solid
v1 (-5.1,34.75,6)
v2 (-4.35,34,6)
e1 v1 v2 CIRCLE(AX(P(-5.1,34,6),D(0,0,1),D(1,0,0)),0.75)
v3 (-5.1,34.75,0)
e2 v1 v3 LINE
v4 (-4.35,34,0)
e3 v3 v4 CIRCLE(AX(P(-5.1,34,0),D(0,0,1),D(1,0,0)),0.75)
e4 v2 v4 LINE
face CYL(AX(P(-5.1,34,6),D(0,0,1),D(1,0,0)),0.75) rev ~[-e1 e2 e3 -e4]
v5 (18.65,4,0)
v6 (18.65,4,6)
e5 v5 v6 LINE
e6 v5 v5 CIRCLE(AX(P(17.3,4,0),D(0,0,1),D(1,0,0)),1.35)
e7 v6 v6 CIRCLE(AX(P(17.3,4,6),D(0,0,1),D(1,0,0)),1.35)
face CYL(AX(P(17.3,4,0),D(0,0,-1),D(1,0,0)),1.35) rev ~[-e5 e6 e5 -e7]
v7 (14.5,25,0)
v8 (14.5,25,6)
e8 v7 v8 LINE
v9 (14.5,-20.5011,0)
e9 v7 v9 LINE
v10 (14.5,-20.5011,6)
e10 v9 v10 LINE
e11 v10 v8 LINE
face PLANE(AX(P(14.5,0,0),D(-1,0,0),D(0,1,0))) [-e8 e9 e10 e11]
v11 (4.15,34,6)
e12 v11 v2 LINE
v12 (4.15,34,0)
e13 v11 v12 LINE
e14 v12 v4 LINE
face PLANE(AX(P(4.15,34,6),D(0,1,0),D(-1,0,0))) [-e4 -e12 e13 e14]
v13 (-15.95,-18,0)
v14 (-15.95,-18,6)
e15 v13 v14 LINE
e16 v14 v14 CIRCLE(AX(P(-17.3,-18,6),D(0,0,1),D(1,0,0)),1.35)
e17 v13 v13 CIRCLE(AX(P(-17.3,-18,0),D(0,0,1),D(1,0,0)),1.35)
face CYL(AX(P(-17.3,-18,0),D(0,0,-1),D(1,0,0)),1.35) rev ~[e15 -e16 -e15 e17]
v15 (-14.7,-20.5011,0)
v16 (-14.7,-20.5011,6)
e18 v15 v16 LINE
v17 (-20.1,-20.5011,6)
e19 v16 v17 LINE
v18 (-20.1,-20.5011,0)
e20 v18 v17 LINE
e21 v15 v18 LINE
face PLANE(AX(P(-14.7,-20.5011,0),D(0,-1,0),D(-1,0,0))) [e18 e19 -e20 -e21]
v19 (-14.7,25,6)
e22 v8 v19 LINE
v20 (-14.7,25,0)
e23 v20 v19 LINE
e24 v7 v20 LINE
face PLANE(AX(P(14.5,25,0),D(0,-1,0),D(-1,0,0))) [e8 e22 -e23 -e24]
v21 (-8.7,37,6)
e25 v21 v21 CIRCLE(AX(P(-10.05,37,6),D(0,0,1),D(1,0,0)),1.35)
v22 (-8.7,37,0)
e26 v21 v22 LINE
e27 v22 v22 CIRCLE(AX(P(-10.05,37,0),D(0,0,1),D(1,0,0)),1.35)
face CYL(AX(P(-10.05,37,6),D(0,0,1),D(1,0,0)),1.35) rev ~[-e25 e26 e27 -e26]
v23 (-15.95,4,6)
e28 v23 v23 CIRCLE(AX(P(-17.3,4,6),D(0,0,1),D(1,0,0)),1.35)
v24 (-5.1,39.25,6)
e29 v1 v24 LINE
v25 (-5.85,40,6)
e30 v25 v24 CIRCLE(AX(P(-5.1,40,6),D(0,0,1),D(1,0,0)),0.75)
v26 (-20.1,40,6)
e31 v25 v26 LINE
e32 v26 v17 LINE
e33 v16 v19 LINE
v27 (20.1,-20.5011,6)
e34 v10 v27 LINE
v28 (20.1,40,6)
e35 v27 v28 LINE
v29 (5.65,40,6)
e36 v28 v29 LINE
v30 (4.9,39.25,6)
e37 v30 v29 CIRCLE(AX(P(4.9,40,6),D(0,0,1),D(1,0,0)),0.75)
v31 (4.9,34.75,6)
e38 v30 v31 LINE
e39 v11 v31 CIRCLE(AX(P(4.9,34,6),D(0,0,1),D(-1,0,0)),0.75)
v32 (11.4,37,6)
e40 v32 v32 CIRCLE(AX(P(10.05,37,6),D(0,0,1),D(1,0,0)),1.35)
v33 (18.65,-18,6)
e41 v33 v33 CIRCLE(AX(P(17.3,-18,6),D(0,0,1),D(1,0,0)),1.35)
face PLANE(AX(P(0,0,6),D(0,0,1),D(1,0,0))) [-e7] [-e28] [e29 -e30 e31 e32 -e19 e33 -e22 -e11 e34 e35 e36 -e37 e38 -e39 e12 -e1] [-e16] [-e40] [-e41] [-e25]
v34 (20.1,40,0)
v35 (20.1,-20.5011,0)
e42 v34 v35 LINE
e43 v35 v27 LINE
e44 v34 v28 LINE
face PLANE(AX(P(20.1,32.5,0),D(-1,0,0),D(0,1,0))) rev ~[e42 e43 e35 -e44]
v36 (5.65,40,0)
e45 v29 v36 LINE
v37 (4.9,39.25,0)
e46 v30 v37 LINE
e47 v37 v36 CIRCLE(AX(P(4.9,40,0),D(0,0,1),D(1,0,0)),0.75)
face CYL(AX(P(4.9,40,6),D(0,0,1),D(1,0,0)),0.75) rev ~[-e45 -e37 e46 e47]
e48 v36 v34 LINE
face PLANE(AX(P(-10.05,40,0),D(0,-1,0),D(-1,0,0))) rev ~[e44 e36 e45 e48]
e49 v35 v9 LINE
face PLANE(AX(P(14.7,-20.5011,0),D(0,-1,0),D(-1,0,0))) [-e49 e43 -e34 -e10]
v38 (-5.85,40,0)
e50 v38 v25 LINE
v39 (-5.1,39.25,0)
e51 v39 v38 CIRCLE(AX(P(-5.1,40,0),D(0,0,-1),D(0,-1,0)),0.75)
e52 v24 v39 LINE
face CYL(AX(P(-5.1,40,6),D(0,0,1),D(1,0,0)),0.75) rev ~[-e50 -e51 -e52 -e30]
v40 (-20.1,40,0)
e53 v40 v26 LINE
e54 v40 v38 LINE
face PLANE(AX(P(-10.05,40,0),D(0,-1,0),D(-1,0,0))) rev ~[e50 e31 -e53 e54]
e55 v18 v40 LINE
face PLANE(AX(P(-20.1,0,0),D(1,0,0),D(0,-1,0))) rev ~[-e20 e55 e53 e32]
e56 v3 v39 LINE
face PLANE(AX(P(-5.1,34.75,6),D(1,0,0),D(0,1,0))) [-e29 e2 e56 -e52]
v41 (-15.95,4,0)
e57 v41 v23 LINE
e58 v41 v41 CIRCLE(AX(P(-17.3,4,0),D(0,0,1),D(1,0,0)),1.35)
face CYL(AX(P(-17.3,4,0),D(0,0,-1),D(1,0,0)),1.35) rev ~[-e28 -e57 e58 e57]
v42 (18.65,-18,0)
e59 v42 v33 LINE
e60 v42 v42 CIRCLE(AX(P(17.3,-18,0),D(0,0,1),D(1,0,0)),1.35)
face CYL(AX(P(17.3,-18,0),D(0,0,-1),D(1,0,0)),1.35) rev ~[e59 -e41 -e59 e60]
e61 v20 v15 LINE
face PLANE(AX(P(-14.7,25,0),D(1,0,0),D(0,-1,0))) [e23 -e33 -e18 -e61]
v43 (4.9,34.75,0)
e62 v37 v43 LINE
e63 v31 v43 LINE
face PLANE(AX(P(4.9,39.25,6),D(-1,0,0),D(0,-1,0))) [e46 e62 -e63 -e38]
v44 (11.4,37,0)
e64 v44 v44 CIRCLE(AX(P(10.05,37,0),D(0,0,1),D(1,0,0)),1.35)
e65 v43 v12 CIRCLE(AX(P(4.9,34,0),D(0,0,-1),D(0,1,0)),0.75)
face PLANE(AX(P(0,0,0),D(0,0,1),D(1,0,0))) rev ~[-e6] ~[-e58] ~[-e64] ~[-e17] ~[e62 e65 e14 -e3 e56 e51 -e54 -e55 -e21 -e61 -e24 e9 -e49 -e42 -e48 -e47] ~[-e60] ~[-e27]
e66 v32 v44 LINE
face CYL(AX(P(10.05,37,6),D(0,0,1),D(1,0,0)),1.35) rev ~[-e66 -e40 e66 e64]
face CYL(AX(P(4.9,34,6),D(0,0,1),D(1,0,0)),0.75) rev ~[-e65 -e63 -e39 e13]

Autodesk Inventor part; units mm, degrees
ref_plane "YZ Plane" through (0, 0, 0) normal (1, 0, 0) x (0, 1, 0)
ref_plane "XZ Plane" through (0, 0, 0) normal (0, 1, 0) x (-1, 0, 0)
ref_plane "XY Plane" through (0, 0, 0) normal (0, 0, 1) x (1, 0, 0)
ref_plane "작업 평면1" through (0, 0, 0) normal (0, 0, 1) x (1, 0, 0)
sketch "스케치1" plane through (0, 0, 0) normal (0, 0, 1) x (1, 0, 0)
  line L0 (14.5, -41) -> (14.5, 11) projected
  line L1 (20.1, -39.6766) -> (20.1, 4.5766) projected
  line L2 (-20.1, 4.5766) -> (-20.1, -39.6766) projected
  line L3 (-14.5, 11) -> (-14.5, -41) projected
  circle A0 centre (-17.3, -18) radius 1.35 projected
  circle A1 centre (17.3, -18) radius 1.35 projected
  circle A2 centre (17.3, 4) radius 1.35 projected
  circle A3 centre (-17.3, 4) radius 1.35 projected
  circle A4 centre (17.3, -18) radius 1.45
  circle A5 centre (-17.3, -18) radius 1.45
  circle A6 centre (-17.3, 4) radius 1.45
  circle A7 centre (17.3, 4) radius 1.45
  line L4 (14.7, -41) -> (14.7, 11)
  line L5 (-14.7, 11) -> (-14.7, -41)
  line L6 (20.1, -20.5011) -> (-20.1, -20.5011)
  line L7 (-20.1, 0) -> (-20.1, 40)
  line L8 (20.1, -20.5011) -> (20.1, 40)
  line L9 (20.1, 40) -> (-20.1, 40)
  line L10 (14.5, 0) -> (14.5, 25)
  line L11 (14.5, 25) -> (-14.7, 25)
  line L12 (-14.7, 25) -> (-14.7, 0)
  line L13 (20.1, 40) -> (15.1, 40)
  line L14 (20.1, 40) -> (10.05, 40)
  line L15 (10.05, 40) -> (0, 40)
  line L16 (0, 40) -> (-10.05, 40)
  line L17 (-10.05, 40) -> (-20.1, 40)
  line L18 (20.1, 25) -> (20.1, 32.5)
  circle A8 centre (10.05, 32.5) radius 1.4
  circle A9 centre (-10.05, 32.5) radius 1.4
  point P0 (0, 0)
  point P1 (0, -20.5011)
  point P2 (-14.7, -20.5011)
  point P3 (14.5, -20.5011)
  dimension "d0" = 0.1
  dimension "d1" = 0.1
  dimension "d2" = -0.1
  dimension "d3" = 0.1
  dimension "d4" = 0.2
  dimension "d5" = 0.2
  dimension "d6" = 20.5011
  dimension "d7" = 40
  dimension "d9" = 15
  dimension "d12" = 5
  dimension "d13" = 40.2
  dimension "d14" = 10.05
  dimension "d15" = 10.05
  dimension "d16" = 10.05
  dimension "d17" = 10.05
  dimension "d18" = 7.5
  dimension "d19" = 2.8
  dimension "d20" = 2.8
  dimension "d21" = 20.1
extrude "돌출1" add sketch "스케치1" along normal blind 6 contours L0 L10 L11 L12 L5 L6 L2 L7 L9 L8 L1 | A4 | A5 | A6 | A7 | A8 | A9
sketch "스케치3" plane through (-20.1, 40, 0) normal (0, 1, 0) x (1, 0, 0)
  line L0 (40.2, 0) -> (0, 0) projected
  line L1 (0, 0) -> (0, -6) projected
  line L2 (40.2, -6) -> (0, -6) projected
  line L3 (40.2, 0) -> (40.2, -6) projected
  point P0 (20.1, 0)
  dimension "d29" = 40.2
sketch "스케치4" plane through (0, 0, 6) normal (0, 0, 1) x (1, 0, 0)
  line L0 (20.1, 40) -> (-20.1, 40) projected
  line L1 (-20.1, 40) -> (20.1, 40)
  line L2 (20.1, 40) -> (20.1, 34)
  line L3 (20.1, 34) -> (-20.1, 34)
  line L4 (-20.1, 34) -> (-20.1, 40)
  line L5 (-20.1, 40) -> (-10.05, 40)
  line L6 (-10.05, 40) -> (10.05, 40)
  circle A0 centre (-10.05, 37) radius 1.35
  circle A1 centre (10.05, 37) radius 1.35
  point P0 (0, 0)
  dimension "d30" = 6
  dimension "d31" = 10.05
  dimension "d32" = 20.1
  dimension "d33" = 2.7
  dimension "d34" = 2.7
extrude "돌출3" cut sketch "스케치4" against normal blind 10 contours A0 | A1
sketch "스케치5" plane through (0, 0, 6) normal (0, 0, 1) x (1, 0, 0)
  circle A0 centre (10.05, 37) radius 1.35 projected
  circle A1 centre (-10.05, 37) radius 1.35 projected
  line L0 (14.5, 25) -> (14.5, -20.5011) projected
  line L1 (14.5, -20.5011) -> (20.1, -20.5011) projected
  line L2 (20.1, -20.5011) -> (20.1, 40) projected
  line L3 (20.1, 40) -> (-20.1, 40) projected
  line L4 (-20.1, 40) -> (-20.1, -20.5011) projected
  line L5 (-20.1, -20.5011) -> (-14.7, -20.5011) projected
  line L6 (-14.7, -20.5011) -> (-14.7, 25) projected
  line L7 (-14.7, 25) -> (14.5, 25) projected
  circle A2 centre (17.3, 4) radius 1.35 projected
  circle A3 centre (17.3, -18) radius 1.35 projected
  circle A4 centre (-17.3, -18) radius 1.35 projected
  circle A5 centre (-17.3, 4) radius 1.35 projected
  line L8 (4.9, 34) -> (-5.1, 34)
  line L9 (-5.1, 34) -> (-5.1, 40)
  line L10 (-5.1, 40) -> (4.9, 40)
  line L11 (4.9, 40) -> (4.9, 34)
  line L12 (4.9, 34) -> (-5.1, 40) construction
  line L13 (-5.1, 34) -> (4.9, 40) construction
  circle A6 centre (-5.1, 40) radius 0.75
  circle A7 centre (-5.1, 34) radius 0.75
  circle A8 centre (4.9, 34) radius 0.75
  circle A9 centre (4.9, 40) radius 0.75
  point P0 (0, 0)
  point P1 (-0.1, 37)
  point P2 (4.15, 34)
  point P3 (4.9, 34.75)
  point P4 (-5.1, 34.75)
  point P5 (-4.35, 34)
  point P6 (-5.1, 39.25)
  point P7 (-4.35, 40)
  point P8 (4.9, 39.25)
  point P9 (5.65, 40)
  dimension "d37" = 10
  dimension "d40" = 1.5
  dimension "d41" = 1.5
  dimension "d42" = 1.5
  dimension "d43" = 1.5
extrude "돌출4" cut sketch "스케치5" against normal blind 6 contours A9 L11 L3 | L11 A9 L3 | A9 L11 A8 L8 A7 L9 A6 L3 | A6 L3 | L3 L9 A6 | A6 L9 L3 | A8 L8 L11 | L11 L8 A8 | A7 L8 L9 | L9 L8 A7
properties part number "feet_holder2" material "PMMA 플라스틱"
